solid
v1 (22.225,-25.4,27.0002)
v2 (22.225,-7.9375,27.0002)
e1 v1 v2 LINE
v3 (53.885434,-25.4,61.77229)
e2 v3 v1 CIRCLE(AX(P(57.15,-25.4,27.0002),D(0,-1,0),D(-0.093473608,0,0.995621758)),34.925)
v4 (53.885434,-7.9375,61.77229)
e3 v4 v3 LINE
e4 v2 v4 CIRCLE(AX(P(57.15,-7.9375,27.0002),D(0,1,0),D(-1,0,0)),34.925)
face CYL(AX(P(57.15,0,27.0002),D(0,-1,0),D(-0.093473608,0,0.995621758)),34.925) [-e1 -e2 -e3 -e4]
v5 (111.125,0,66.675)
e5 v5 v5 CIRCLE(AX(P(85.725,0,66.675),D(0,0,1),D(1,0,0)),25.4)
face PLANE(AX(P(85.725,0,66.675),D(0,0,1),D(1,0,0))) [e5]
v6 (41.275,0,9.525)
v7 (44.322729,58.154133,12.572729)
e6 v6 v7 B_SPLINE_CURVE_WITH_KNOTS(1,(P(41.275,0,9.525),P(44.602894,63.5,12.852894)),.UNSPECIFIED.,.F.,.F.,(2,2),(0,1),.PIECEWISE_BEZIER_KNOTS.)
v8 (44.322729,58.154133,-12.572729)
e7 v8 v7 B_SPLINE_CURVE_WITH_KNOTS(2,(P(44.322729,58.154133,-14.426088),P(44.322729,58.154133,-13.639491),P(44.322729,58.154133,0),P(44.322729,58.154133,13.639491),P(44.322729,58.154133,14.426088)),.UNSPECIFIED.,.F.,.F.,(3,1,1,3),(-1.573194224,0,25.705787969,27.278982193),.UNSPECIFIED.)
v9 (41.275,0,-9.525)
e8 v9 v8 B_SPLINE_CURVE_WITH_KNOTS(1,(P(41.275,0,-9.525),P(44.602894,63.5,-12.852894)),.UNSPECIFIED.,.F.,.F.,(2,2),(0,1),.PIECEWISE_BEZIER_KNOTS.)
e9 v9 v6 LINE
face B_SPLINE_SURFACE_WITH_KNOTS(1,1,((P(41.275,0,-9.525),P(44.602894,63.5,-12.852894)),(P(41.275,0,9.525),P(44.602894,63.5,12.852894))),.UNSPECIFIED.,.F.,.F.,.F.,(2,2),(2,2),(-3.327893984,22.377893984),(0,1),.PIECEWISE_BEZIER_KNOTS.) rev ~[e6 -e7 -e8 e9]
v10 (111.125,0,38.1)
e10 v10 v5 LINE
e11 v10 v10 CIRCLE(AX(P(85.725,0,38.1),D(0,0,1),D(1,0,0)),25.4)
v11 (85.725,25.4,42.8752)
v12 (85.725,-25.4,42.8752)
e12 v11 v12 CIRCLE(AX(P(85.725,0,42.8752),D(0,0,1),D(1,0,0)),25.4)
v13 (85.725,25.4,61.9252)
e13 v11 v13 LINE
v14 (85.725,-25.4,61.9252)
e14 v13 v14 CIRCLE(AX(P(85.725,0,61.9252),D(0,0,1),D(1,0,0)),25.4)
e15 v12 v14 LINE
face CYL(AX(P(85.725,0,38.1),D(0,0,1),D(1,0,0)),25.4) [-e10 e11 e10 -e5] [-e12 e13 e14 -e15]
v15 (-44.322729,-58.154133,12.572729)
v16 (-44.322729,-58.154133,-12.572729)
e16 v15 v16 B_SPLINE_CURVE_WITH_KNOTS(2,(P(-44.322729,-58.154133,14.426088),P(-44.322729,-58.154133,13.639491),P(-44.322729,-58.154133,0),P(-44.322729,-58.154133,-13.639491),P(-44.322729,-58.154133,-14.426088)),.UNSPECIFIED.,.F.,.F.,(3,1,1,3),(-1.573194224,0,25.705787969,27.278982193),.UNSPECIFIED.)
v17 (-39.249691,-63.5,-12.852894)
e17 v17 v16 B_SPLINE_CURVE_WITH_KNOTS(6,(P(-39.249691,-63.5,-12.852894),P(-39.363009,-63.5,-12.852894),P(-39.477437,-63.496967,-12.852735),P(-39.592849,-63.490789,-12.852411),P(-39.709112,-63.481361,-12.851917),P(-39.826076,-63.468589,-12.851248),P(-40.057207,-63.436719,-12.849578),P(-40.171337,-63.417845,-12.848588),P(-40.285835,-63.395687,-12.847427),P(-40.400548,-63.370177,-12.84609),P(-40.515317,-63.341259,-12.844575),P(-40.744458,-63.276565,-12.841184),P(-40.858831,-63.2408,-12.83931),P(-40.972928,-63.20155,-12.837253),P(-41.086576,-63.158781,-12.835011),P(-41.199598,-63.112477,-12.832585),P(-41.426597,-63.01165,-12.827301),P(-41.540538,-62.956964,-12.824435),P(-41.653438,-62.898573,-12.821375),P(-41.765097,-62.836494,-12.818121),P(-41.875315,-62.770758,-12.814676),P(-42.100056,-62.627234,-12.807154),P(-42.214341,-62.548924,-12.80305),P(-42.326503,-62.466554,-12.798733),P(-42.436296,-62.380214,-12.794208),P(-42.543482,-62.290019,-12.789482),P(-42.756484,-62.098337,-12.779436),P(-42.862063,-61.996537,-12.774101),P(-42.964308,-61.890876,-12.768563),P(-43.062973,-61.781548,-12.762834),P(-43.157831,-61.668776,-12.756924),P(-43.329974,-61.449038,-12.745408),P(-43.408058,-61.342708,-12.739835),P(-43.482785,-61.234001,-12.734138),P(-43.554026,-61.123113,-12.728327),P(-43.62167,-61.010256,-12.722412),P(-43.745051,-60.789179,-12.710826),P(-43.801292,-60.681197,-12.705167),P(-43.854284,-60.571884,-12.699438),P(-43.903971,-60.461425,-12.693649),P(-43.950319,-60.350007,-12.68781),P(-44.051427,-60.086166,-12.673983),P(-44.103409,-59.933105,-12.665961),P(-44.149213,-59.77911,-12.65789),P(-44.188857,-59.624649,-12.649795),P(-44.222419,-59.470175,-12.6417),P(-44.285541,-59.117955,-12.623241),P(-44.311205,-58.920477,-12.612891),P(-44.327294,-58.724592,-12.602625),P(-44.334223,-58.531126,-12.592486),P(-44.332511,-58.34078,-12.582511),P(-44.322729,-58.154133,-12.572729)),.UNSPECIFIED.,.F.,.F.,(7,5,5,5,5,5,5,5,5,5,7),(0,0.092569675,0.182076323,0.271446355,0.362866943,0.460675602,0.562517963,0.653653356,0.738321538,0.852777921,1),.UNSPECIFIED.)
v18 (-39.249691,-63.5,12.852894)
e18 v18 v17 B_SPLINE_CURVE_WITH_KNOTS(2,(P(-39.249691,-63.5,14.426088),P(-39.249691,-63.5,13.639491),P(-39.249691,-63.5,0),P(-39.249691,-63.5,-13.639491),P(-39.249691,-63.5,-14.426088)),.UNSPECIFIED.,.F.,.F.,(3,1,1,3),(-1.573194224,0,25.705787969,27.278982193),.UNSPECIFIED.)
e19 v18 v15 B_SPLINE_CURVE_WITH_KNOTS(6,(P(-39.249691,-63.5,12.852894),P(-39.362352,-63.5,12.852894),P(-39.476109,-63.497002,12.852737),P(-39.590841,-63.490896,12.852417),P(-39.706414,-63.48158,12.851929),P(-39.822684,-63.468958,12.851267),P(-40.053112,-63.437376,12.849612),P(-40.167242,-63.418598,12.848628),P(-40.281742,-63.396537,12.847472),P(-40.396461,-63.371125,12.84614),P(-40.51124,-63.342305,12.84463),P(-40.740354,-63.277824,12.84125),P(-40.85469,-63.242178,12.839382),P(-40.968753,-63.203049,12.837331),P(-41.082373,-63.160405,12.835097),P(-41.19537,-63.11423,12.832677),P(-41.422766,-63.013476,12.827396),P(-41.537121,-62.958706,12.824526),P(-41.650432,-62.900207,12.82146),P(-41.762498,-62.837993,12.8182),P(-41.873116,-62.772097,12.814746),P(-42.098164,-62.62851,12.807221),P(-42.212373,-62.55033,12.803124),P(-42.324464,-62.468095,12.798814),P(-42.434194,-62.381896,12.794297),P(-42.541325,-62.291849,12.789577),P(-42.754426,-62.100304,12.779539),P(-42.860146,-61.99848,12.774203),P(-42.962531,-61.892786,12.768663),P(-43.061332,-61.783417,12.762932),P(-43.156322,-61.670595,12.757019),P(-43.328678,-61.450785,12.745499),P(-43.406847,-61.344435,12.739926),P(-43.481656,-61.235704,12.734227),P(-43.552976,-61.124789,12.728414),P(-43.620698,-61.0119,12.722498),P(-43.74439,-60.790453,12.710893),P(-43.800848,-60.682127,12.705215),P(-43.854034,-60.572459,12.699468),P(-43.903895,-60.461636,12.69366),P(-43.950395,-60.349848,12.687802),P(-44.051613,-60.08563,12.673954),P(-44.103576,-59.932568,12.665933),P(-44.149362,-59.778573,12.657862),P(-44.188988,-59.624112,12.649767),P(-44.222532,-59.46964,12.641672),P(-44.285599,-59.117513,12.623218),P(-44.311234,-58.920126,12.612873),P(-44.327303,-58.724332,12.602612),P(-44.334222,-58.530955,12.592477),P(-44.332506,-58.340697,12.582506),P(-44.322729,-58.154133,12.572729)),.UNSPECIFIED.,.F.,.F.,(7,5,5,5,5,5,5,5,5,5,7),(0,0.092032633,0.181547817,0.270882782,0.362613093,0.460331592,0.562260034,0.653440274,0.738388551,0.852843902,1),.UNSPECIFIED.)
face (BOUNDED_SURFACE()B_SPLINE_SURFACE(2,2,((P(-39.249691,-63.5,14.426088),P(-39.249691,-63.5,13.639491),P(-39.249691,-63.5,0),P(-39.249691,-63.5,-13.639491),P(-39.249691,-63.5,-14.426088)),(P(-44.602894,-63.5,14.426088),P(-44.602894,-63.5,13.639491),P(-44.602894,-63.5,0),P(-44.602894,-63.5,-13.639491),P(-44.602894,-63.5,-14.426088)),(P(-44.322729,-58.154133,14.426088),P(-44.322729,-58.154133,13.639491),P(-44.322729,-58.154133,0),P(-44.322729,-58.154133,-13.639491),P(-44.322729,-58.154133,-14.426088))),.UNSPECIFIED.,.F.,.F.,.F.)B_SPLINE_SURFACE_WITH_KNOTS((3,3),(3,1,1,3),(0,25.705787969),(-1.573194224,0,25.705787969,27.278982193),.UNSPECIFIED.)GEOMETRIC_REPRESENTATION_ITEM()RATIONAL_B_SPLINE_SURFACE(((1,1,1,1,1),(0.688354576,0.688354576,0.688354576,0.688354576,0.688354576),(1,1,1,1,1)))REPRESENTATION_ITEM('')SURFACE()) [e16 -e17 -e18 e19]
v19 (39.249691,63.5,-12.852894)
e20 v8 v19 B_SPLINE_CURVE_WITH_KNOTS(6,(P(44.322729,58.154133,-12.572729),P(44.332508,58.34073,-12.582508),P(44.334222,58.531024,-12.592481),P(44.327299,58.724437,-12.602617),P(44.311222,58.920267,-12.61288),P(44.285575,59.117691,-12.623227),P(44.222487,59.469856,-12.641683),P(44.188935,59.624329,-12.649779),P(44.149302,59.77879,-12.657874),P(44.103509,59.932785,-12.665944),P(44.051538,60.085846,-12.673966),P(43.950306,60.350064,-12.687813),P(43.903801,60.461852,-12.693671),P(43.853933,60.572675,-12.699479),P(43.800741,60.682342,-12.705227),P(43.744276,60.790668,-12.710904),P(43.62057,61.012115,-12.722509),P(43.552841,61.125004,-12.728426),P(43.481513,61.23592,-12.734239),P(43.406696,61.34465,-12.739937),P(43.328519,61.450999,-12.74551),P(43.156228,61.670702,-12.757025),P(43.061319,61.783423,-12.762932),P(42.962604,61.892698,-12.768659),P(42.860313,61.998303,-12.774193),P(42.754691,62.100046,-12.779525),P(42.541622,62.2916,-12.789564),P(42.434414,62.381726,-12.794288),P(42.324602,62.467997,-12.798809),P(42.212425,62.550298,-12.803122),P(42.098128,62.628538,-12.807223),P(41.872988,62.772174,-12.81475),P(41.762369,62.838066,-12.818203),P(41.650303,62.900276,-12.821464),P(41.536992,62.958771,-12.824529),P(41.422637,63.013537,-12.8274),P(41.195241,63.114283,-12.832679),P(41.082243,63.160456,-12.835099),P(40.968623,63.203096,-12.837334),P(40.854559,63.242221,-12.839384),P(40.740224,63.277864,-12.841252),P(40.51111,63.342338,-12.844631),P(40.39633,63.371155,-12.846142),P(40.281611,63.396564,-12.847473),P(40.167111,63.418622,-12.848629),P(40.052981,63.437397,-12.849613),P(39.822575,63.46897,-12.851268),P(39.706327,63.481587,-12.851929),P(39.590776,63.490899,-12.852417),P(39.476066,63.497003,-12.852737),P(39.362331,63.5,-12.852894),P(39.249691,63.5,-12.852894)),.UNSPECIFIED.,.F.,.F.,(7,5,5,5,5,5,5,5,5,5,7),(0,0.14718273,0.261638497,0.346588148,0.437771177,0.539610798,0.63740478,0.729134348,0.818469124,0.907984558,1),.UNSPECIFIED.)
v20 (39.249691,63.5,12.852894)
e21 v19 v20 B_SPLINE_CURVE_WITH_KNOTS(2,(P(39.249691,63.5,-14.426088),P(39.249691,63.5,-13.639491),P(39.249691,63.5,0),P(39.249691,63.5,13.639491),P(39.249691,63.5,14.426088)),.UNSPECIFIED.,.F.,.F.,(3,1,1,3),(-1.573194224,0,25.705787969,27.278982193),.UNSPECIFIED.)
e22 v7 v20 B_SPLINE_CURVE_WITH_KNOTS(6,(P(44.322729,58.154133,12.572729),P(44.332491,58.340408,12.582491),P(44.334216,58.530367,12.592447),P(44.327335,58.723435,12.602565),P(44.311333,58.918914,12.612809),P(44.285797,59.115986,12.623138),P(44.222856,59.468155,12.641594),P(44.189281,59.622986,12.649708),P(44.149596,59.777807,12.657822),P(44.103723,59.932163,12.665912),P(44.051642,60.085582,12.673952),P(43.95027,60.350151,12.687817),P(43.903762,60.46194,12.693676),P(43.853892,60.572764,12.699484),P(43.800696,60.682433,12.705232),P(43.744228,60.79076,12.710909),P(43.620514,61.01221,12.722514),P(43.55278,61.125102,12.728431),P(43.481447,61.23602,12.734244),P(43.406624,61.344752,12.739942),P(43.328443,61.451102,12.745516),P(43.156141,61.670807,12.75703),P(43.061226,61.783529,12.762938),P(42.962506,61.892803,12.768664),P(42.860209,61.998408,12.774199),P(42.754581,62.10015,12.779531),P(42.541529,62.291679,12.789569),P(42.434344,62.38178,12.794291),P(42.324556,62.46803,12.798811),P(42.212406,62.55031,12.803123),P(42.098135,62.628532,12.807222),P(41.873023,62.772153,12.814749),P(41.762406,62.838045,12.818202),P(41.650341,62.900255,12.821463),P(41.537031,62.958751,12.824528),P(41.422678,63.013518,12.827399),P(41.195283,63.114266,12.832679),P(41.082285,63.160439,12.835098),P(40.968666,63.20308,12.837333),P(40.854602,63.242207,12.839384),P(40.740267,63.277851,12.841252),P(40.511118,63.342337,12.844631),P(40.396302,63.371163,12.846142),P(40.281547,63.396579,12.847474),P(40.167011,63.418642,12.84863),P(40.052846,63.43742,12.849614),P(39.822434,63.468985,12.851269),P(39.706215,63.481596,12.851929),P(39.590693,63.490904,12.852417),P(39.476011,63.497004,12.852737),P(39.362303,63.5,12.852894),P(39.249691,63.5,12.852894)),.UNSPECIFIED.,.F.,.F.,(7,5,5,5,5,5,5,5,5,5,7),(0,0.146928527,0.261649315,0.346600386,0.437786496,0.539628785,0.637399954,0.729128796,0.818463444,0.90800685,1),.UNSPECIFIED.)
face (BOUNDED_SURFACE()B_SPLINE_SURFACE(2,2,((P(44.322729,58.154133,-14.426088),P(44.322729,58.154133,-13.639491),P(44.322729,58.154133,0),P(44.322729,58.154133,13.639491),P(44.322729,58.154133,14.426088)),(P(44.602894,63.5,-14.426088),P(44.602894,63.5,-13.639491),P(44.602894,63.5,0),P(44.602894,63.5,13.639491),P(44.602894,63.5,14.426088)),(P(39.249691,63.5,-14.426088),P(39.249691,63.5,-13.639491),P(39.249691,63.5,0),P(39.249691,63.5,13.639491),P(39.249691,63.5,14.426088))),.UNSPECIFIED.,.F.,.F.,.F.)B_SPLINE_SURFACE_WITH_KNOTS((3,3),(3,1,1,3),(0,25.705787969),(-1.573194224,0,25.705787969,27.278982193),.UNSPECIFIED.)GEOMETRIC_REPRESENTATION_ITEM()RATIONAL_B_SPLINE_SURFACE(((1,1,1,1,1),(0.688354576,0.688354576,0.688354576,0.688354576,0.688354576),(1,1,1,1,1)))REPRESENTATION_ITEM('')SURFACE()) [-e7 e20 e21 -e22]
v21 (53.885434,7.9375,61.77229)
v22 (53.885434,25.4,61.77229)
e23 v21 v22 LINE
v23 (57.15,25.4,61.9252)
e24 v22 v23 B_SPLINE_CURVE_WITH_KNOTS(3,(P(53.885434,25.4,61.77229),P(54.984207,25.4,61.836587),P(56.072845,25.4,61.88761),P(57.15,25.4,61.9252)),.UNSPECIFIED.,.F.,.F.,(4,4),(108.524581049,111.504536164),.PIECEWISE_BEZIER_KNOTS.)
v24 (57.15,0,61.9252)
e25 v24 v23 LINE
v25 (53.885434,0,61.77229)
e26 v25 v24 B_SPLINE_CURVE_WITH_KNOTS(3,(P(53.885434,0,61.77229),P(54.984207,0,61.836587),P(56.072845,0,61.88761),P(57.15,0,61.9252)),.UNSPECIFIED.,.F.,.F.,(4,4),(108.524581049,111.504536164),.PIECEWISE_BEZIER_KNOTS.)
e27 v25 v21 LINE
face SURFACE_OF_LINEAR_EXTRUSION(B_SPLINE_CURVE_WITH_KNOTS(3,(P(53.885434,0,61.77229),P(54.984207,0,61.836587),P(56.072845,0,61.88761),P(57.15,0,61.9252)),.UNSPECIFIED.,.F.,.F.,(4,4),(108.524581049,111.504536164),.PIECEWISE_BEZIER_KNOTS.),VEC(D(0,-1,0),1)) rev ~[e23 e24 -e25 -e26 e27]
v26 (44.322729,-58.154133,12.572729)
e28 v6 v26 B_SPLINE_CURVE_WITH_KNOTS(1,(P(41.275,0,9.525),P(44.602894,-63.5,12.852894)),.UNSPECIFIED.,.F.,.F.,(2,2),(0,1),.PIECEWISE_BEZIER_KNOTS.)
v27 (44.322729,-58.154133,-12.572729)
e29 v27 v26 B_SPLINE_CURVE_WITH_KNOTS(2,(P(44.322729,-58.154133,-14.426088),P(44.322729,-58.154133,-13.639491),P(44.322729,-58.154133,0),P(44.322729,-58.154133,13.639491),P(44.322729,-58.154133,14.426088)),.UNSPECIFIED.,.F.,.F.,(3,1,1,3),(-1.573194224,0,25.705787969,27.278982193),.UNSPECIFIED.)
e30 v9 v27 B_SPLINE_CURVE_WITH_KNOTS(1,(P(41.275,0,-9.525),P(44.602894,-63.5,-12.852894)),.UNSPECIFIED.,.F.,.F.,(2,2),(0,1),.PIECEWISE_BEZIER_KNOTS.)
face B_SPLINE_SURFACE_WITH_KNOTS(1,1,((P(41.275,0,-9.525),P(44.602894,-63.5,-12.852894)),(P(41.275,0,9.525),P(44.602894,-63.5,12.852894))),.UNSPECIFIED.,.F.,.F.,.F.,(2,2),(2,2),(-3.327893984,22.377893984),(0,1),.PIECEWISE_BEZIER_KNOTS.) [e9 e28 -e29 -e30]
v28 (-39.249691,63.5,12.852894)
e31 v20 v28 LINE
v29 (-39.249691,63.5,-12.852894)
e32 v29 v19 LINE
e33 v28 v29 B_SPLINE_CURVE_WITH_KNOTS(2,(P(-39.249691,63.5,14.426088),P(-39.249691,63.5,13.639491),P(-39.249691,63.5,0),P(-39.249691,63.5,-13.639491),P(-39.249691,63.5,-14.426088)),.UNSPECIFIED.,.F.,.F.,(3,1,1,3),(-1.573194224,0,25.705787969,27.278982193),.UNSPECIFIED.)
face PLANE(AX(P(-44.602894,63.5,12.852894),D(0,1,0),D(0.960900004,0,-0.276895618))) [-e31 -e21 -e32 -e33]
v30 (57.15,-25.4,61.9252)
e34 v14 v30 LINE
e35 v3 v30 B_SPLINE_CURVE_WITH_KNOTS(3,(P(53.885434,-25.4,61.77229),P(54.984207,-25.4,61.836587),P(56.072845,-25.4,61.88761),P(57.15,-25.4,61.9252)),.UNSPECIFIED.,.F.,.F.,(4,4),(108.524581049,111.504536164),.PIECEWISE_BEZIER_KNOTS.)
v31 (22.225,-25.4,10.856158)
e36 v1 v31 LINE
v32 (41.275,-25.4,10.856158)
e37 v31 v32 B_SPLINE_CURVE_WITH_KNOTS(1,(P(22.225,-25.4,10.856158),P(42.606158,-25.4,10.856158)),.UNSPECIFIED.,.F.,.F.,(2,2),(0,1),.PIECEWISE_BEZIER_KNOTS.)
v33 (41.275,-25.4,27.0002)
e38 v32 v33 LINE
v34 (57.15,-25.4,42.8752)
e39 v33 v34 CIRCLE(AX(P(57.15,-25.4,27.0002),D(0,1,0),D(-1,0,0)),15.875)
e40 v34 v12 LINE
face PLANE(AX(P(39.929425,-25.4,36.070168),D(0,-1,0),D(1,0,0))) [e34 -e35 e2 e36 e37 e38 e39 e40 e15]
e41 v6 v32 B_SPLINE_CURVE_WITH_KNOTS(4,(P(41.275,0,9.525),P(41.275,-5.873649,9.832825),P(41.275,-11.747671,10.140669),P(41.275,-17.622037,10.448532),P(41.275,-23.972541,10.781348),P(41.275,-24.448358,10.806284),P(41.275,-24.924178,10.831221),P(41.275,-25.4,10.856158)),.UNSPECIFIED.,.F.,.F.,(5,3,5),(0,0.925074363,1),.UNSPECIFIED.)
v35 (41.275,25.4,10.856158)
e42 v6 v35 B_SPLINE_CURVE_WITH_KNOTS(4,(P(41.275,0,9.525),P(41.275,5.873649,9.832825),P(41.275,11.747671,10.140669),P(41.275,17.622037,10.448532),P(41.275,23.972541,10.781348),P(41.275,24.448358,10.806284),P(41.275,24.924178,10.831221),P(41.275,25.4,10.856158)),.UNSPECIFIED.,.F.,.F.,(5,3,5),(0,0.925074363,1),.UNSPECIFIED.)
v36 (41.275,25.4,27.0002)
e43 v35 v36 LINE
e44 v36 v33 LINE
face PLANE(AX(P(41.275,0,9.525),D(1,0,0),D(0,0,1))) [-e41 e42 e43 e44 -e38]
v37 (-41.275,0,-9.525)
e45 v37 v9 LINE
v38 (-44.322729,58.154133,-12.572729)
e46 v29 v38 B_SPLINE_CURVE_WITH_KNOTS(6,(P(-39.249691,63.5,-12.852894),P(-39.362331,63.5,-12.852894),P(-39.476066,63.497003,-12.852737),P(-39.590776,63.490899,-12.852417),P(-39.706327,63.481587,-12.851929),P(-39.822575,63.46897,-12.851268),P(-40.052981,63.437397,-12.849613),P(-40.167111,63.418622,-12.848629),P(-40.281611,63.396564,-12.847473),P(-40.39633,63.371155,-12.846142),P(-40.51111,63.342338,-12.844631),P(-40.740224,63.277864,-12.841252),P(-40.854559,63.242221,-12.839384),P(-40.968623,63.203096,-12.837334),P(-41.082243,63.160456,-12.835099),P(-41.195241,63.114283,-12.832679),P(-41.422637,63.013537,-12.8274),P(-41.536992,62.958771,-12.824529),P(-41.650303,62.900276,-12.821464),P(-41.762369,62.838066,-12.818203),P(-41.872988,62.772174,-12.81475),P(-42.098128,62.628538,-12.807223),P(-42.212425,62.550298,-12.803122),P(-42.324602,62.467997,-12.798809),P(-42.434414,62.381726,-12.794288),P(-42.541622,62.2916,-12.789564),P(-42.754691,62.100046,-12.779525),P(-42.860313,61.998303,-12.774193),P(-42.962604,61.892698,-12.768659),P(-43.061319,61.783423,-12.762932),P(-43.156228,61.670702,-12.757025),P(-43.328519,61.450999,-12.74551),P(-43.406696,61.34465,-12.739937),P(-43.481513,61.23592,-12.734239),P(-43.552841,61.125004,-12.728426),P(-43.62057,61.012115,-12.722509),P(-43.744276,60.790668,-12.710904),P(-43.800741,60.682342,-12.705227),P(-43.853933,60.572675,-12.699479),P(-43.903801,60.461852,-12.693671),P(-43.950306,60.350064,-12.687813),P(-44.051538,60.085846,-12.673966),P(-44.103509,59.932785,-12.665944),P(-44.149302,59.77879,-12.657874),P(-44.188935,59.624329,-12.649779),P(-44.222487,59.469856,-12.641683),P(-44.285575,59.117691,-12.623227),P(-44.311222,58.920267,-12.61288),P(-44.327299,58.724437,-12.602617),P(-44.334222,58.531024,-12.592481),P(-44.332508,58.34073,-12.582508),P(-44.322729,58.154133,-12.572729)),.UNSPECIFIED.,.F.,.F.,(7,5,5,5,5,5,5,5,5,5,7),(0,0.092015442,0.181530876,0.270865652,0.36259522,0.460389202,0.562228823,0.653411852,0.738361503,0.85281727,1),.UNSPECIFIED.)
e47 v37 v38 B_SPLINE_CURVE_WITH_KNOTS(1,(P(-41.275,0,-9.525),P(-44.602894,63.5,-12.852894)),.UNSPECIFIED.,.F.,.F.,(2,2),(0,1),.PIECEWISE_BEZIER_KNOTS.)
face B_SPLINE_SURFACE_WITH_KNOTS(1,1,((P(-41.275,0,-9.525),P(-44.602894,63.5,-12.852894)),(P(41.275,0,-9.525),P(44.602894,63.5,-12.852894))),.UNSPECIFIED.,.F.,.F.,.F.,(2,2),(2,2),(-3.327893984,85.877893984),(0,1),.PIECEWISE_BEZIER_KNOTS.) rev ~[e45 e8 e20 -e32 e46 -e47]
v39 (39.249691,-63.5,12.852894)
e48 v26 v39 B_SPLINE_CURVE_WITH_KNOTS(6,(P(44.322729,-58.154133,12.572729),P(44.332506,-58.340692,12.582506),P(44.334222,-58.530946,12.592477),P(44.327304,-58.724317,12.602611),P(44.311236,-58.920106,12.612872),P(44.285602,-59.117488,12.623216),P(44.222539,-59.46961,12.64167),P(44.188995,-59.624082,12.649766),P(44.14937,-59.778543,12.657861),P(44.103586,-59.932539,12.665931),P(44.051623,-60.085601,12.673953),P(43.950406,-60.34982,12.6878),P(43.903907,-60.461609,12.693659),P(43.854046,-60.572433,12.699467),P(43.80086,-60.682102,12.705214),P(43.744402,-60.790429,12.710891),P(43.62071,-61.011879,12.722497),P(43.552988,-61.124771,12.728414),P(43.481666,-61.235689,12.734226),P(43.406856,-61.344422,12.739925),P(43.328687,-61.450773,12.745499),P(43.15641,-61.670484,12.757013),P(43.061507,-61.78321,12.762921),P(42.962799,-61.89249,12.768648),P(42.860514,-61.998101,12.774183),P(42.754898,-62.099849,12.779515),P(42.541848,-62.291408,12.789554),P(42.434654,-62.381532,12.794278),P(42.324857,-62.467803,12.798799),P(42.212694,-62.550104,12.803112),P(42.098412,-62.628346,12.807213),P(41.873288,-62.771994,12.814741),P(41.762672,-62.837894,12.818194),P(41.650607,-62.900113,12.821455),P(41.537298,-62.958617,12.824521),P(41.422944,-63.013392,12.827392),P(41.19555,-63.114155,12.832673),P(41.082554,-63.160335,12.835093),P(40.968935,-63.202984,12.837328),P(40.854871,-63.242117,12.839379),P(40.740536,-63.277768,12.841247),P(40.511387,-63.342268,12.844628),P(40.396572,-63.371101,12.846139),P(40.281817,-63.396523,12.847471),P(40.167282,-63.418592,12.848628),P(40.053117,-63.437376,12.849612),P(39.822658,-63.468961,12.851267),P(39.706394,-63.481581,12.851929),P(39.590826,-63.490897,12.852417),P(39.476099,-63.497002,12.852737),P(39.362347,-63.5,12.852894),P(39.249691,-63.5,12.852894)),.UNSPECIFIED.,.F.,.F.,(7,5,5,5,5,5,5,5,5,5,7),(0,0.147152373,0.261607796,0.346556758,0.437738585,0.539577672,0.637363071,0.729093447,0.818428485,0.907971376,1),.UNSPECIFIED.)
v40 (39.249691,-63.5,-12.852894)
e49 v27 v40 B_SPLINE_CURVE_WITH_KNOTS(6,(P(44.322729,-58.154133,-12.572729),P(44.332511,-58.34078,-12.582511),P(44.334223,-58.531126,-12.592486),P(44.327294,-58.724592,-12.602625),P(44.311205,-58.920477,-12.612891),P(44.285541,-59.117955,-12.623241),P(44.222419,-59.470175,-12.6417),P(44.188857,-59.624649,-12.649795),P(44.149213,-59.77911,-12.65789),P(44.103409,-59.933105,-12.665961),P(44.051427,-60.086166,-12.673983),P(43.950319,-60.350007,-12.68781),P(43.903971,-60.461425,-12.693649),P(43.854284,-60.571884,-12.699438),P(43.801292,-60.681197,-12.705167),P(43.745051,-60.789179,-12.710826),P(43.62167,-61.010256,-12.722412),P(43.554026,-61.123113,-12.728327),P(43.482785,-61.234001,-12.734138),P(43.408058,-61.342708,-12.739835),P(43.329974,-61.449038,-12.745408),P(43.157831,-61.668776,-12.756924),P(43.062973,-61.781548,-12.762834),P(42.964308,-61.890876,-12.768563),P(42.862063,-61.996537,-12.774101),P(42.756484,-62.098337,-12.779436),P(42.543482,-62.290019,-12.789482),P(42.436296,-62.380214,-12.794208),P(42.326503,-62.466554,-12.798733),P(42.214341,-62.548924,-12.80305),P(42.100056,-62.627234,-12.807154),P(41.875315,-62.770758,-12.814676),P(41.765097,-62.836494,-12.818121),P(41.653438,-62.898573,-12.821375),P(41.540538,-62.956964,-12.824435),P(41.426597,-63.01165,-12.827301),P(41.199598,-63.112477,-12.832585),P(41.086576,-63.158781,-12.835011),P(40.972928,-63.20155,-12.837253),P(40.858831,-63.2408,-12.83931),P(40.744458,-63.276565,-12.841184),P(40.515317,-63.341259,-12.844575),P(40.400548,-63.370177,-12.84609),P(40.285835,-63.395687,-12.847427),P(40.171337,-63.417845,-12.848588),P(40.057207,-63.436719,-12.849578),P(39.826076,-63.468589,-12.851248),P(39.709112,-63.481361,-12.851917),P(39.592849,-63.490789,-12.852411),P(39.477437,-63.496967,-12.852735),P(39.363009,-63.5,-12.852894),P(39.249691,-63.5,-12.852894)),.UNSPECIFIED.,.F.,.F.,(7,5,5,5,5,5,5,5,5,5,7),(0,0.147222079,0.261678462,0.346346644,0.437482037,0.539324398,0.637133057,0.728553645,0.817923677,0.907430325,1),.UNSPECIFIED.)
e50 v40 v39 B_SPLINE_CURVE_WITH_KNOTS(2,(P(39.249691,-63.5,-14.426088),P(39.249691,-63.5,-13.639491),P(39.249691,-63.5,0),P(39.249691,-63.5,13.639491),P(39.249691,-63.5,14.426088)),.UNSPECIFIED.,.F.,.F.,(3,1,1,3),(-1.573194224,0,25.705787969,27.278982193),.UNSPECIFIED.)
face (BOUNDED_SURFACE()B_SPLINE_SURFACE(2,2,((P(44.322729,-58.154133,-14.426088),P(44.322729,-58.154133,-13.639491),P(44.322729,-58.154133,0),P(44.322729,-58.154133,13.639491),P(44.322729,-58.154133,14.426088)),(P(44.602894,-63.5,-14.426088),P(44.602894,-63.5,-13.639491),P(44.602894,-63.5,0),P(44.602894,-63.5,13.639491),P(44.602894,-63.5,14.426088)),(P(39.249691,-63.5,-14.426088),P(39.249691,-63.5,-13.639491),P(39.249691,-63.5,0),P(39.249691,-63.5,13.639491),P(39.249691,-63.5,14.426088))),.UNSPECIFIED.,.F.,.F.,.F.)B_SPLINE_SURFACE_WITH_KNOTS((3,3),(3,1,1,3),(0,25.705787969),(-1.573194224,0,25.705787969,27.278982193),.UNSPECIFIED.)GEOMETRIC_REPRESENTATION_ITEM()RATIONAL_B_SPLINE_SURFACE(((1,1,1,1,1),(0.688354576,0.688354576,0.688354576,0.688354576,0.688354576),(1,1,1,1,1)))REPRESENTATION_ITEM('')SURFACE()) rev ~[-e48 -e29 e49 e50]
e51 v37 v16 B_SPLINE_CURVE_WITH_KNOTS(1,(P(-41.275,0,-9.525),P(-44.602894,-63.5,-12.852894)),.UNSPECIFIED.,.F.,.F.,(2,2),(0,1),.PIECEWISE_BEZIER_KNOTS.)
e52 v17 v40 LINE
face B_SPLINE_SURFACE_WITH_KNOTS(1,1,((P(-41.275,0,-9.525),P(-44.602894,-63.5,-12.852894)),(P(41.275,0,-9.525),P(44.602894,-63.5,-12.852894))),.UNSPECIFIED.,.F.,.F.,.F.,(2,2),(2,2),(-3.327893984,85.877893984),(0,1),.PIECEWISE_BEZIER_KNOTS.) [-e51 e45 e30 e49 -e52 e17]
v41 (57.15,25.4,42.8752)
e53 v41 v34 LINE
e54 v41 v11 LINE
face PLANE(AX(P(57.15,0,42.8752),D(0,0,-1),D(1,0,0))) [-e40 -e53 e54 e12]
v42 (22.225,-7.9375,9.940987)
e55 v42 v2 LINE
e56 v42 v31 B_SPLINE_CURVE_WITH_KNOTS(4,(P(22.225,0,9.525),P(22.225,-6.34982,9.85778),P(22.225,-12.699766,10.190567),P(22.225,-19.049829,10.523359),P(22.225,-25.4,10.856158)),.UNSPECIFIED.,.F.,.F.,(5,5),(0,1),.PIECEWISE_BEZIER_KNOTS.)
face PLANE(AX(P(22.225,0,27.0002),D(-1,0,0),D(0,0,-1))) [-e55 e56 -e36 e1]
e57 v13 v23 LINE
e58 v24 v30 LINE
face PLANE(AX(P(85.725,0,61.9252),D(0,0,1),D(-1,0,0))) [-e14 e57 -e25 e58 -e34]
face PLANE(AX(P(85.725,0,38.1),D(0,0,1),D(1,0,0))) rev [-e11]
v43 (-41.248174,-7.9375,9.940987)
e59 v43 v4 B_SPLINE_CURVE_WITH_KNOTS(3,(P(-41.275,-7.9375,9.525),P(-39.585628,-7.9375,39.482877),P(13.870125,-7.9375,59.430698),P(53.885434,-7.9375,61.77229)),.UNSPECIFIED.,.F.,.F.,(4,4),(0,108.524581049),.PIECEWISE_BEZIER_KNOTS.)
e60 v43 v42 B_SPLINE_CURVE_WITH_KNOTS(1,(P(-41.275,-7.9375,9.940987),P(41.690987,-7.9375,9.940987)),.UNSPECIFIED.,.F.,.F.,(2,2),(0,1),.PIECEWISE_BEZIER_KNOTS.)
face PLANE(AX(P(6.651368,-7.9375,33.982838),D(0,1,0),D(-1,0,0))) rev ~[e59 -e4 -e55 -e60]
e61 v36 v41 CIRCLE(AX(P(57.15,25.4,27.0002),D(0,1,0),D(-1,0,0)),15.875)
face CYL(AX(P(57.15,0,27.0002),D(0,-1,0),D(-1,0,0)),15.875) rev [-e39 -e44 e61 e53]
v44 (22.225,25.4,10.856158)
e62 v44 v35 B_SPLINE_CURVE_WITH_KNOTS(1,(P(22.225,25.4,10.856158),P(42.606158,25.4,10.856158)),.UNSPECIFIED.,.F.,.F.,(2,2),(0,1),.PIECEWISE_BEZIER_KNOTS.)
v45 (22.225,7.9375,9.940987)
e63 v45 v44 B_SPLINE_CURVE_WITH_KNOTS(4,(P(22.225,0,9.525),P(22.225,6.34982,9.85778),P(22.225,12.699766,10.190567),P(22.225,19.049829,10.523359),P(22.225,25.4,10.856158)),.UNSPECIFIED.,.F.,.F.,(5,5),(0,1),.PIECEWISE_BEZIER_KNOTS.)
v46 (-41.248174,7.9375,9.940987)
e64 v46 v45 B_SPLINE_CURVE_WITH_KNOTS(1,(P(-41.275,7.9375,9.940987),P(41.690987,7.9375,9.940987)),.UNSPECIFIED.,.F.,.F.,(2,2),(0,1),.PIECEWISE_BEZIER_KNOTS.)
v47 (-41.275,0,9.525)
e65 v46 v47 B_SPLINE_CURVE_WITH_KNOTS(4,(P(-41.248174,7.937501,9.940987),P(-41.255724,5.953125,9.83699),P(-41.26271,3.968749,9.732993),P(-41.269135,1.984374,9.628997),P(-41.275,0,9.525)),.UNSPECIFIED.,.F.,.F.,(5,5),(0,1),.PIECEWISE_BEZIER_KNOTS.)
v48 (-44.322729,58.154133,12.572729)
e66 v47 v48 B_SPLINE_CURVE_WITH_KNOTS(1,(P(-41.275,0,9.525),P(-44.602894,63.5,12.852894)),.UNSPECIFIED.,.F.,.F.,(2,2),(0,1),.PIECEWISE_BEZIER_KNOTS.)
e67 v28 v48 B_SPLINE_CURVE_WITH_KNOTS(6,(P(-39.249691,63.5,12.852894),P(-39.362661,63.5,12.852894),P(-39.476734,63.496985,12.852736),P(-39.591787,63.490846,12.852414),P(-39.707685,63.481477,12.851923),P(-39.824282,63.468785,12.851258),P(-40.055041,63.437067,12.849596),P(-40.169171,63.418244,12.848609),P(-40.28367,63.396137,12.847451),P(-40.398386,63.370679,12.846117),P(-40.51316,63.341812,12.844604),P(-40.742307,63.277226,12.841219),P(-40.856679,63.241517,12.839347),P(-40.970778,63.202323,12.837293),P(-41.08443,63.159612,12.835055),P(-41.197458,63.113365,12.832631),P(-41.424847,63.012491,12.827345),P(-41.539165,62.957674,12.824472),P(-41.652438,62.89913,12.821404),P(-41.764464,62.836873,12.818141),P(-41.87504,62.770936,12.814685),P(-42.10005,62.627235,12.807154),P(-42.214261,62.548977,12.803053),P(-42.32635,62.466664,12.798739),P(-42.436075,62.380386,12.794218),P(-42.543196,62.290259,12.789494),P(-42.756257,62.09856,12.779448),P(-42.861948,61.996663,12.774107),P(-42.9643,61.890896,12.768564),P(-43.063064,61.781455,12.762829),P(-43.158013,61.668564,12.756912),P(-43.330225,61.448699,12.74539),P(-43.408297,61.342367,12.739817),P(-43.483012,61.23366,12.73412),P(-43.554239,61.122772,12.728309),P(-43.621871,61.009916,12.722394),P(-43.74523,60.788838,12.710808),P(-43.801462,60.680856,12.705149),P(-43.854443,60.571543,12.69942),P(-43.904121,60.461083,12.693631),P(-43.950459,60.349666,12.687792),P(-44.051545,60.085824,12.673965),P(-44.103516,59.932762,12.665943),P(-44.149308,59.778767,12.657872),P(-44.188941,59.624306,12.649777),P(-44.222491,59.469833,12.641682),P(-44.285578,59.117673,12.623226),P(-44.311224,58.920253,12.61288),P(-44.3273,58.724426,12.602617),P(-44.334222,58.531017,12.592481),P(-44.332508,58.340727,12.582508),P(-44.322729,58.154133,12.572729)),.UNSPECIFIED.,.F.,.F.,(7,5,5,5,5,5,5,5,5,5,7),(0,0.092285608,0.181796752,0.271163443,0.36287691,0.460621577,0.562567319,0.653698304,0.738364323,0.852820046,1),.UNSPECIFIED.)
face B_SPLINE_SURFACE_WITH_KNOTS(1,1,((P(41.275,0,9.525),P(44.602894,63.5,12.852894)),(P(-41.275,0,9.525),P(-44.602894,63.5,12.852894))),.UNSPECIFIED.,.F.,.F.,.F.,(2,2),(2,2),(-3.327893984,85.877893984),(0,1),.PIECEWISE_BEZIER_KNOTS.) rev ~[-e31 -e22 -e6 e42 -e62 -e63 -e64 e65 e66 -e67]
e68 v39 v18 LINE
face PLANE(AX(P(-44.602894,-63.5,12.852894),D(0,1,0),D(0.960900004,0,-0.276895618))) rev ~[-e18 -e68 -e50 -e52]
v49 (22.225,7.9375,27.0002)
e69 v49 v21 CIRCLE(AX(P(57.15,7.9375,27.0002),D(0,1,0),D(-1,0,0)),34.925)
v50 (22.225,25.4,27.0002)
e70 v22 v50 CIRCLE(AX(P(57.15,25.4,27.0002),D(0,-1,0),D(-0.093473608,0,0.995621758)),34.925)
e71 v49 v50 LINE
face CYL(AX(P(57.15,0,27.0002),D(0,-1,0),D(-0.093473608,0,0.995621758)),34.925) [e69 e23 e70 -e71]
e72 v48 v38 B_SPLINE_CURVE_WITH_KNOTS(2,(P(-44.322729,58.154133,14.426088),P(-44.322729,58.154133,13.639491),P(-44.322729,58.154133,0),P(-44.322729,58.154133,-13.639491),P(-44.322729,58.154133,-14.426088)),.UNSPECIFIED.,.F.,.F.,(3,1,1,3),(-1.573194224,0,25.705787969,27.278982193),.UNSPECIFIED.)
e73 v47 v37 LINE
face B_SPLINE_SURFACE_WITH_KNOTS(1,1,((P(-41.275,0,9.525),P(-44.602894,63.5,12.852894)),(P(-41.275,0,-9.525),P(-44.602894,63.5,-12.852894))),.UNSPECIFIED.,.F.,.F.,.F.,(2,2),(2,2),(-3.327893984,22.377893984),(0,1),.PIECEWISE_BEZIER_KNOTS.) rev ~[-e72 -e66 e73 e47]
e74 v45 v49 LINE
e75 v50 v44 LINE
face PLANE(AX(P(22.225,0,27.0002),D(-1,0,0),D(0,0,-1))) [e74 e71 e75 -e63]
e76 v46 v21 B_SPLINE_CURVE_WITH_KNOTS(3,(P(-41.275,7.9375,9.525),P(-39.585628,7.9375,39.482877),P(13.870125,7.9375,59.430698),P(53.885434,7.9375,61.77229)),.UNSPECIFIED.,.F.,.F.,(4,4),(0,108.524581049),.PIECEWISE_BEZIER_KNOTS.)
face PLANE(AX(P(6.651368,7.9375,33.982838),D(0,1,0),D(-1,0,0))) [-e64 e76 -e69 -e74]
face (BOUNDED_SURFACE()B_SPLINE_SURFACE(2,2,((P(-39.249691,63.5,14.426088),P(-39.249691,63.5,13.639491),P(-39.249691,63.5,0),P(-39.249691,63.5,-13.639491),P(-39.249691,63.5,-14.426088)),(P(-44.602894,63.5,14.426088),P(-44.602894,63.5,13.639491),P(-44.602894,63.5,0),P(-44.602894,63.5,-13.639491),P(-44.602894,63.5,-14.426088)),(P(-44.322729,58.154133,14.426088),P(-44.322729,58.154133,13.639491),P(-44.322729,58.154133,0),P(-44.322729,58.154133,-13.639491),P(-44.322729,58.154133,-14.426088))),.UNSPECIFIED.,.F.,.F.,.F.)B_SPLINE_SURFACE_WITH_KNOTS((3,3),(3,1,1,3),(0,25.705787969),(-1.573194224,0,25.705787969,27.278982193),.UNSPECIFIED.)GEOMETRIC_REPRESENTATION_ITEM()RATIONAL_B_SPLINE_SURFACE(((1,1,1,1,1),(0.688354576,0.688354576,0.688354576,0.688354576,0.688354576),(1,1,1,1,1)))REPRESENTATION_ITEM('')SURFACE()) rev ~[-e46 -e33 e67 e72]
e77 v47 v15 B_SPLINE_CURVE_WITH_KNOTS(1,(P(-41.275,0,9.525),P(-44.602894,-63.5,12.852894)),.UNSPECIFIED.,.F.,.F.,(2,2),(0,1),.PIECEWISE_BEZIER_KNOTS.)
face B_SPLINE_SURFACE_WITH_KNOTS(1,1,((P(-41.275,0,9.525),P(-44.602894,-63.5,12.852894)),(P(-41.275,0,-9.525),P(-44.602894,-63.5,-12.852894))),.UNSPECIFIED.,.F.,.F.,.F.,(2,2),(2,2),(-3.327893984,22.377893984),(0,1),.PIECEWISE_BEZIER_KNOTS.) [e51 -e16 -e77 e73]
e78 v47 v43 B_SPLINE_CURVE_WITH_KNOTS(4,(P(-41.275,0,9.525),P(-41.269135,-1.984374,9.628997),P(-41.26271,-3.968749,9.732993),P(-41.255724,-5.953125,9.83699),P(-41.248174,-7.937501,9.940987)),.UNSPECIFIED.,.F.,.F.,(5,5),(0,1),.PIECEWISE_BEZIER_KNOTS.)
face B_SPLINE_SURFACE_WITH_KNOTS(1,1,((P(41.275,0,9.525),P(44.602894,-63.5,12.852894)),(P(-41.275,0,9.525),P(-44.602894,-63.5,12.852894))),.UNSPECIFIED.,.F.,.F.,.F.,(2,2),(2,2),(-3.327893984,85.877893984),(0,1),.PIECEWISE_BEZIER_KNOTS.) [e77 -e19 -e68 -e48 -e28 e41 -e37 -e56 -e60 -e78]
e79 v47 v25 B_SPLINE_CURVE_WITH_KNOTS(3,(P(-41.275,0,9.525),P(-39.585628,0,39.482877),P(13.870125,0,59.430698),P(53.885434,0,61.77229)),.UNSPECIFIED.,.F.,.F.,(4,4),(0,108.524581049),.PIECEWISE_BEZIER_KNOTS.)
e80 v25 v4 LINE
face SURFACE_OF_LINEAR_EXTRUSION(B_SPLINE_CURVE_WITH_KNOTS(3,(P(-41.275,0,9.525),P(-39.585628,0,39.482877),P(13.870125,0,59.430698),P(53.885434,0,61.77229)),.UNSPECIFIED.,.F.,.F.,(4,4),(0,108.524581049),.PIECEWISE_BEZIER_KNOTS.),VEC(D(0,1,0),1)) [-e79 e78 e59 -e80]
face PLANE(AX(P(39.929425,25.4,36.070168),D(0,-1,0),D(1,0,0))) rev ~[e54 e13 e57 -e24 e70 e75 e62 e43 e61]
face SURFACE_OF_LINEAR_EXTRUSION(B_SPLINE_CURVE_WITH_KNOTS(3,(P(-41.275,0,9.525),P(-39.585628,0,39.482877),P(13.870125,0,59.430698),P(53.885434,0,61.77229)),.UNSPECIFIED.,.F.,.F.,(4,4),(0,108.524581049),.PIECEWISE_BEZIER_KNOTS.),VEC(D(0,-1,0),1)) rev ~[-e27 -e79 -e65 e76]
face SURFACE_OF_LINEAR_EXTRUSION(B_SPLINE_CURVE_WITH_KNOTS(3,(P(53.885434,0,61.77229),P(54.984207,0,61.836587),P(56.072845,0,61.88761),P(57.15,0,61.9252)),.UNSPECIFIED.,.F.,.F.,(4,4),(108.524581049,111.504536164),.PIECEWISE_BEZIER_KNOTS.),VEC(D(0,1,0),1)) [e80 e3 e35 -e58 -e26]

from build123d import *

# Parameters (mm, degrees)
F1_DEPTH = 63.5
F1_TAPER = -3
F0_W     = 25.4
F0_H     = 19.05
F2_DEPTH = 25.4
F3_DEPTH = 7.9375
F5_R     = 5.08


with BuildPart() as f1:
    # F0 (on Front) → F1 (new body, symmetric)
    with BuildSketch(Plane.XZ):
        Polygon((22.225, 9.525), (-41.275, 9.525), (-41.275, -9.525), (41.275, -9.525), (41.275, 9.525), align=None)
    extrude(amount=F1_DEPTH, both=True, taper=F1_TAPER)

    # F0 (on Front) → F2 (join, symmetric)
    with BuildSketch(Plane.XZ):
        with BuildLine():
            Line((22.225, 27.0002), (22.225, 9.525))
            Line((22.225, 9.525), (41.275, 9.525))
            Line((41.275, 9.525), (41.275, 27.0002))
            ThreePointArc((41.275, 27.0002), (45.9246798487, 38.2255201513), (57.15, 42.8752))
            Line((57.15, 42.8752), (60.325, 42.8752))
            Line((60.325, 42.8752), (60.325, 61.9252))
            Line((60.325, 61.9252), (57.15, 61.9252))
            add(Edge.make_bspline(
                [(53.8854342407, 61.7722898912), (54.9842067368, 61.8365871986), (56.0728453275, 61.8876096574), (57.15, 61.9252)],
                knots=[108.5245810491, 108.5245810491, 108.5245810491, 108.5245810491, 111.5045361635, 111.5045361635, 111.5045361635, 111.5045361635], degree=3))
            ThreePointArc((53.8854342407, 61.7722898912), (31.3258777096, 50.5133948686), (22.225, 27.0002))
        make_face()
        with Locations((73.025, 52.4002)):
            Rectangle(F0_W, F0_H)
    extrude(amount=F2_DEPTH, both=True)

    # F0 (on Front) → F3 (join, symmetric)
    with BuildSketch(Plane.XZ):
        with BuildLine():
            add(Edge.make_bspline(
                [(-41.275, 9.525), (-39.5856284224, 39.4828766469), (13.870125209, 59.4306981306), (53.8854342407, 61.7722898912)],
                knots=[0, 0, 0, 0, 108.5245810491, 108.5245810491, 108.5245810491, 108.5245810491], degree=3))
            Line((-41.275, 9.525), (22.225, 9.525))
            Line((22.225, 9.525), (22.225, 27.0002))
            ThreePointArc((22.225, 27.0002), (31.3258777096, 50.5133948686), (53.8854342407, 61.7722898912))
        make_face()
    extrude(amount=F3_DEPTH, both=True)

    # F0 (on Front) → F4 (revolve)
    with BuildSketch(Plane.XZ):
        Polygon((85.725, 66.675), (85.725, 61.9252), (85.725, 42.8752), (85.725, 38.1), (111.125, 38.1), (111.125, 66.675), align=None)
    revolve(axis=Axis((85.725, 0, 52.3875), (0, 0, 1)))

    # F5
    f5_edges = [f1.edges().sort_by_distance(p)[0] for p in [
        (44.602894, -63.5, 0),
        (-44.602894, -63.5, 0),
        (44.602894, 63.5, 0),
        (-44.602894, 63.5, 0),
    ]]
    fillet(f5_edges, radius=F5_R)


solid = f1.part
